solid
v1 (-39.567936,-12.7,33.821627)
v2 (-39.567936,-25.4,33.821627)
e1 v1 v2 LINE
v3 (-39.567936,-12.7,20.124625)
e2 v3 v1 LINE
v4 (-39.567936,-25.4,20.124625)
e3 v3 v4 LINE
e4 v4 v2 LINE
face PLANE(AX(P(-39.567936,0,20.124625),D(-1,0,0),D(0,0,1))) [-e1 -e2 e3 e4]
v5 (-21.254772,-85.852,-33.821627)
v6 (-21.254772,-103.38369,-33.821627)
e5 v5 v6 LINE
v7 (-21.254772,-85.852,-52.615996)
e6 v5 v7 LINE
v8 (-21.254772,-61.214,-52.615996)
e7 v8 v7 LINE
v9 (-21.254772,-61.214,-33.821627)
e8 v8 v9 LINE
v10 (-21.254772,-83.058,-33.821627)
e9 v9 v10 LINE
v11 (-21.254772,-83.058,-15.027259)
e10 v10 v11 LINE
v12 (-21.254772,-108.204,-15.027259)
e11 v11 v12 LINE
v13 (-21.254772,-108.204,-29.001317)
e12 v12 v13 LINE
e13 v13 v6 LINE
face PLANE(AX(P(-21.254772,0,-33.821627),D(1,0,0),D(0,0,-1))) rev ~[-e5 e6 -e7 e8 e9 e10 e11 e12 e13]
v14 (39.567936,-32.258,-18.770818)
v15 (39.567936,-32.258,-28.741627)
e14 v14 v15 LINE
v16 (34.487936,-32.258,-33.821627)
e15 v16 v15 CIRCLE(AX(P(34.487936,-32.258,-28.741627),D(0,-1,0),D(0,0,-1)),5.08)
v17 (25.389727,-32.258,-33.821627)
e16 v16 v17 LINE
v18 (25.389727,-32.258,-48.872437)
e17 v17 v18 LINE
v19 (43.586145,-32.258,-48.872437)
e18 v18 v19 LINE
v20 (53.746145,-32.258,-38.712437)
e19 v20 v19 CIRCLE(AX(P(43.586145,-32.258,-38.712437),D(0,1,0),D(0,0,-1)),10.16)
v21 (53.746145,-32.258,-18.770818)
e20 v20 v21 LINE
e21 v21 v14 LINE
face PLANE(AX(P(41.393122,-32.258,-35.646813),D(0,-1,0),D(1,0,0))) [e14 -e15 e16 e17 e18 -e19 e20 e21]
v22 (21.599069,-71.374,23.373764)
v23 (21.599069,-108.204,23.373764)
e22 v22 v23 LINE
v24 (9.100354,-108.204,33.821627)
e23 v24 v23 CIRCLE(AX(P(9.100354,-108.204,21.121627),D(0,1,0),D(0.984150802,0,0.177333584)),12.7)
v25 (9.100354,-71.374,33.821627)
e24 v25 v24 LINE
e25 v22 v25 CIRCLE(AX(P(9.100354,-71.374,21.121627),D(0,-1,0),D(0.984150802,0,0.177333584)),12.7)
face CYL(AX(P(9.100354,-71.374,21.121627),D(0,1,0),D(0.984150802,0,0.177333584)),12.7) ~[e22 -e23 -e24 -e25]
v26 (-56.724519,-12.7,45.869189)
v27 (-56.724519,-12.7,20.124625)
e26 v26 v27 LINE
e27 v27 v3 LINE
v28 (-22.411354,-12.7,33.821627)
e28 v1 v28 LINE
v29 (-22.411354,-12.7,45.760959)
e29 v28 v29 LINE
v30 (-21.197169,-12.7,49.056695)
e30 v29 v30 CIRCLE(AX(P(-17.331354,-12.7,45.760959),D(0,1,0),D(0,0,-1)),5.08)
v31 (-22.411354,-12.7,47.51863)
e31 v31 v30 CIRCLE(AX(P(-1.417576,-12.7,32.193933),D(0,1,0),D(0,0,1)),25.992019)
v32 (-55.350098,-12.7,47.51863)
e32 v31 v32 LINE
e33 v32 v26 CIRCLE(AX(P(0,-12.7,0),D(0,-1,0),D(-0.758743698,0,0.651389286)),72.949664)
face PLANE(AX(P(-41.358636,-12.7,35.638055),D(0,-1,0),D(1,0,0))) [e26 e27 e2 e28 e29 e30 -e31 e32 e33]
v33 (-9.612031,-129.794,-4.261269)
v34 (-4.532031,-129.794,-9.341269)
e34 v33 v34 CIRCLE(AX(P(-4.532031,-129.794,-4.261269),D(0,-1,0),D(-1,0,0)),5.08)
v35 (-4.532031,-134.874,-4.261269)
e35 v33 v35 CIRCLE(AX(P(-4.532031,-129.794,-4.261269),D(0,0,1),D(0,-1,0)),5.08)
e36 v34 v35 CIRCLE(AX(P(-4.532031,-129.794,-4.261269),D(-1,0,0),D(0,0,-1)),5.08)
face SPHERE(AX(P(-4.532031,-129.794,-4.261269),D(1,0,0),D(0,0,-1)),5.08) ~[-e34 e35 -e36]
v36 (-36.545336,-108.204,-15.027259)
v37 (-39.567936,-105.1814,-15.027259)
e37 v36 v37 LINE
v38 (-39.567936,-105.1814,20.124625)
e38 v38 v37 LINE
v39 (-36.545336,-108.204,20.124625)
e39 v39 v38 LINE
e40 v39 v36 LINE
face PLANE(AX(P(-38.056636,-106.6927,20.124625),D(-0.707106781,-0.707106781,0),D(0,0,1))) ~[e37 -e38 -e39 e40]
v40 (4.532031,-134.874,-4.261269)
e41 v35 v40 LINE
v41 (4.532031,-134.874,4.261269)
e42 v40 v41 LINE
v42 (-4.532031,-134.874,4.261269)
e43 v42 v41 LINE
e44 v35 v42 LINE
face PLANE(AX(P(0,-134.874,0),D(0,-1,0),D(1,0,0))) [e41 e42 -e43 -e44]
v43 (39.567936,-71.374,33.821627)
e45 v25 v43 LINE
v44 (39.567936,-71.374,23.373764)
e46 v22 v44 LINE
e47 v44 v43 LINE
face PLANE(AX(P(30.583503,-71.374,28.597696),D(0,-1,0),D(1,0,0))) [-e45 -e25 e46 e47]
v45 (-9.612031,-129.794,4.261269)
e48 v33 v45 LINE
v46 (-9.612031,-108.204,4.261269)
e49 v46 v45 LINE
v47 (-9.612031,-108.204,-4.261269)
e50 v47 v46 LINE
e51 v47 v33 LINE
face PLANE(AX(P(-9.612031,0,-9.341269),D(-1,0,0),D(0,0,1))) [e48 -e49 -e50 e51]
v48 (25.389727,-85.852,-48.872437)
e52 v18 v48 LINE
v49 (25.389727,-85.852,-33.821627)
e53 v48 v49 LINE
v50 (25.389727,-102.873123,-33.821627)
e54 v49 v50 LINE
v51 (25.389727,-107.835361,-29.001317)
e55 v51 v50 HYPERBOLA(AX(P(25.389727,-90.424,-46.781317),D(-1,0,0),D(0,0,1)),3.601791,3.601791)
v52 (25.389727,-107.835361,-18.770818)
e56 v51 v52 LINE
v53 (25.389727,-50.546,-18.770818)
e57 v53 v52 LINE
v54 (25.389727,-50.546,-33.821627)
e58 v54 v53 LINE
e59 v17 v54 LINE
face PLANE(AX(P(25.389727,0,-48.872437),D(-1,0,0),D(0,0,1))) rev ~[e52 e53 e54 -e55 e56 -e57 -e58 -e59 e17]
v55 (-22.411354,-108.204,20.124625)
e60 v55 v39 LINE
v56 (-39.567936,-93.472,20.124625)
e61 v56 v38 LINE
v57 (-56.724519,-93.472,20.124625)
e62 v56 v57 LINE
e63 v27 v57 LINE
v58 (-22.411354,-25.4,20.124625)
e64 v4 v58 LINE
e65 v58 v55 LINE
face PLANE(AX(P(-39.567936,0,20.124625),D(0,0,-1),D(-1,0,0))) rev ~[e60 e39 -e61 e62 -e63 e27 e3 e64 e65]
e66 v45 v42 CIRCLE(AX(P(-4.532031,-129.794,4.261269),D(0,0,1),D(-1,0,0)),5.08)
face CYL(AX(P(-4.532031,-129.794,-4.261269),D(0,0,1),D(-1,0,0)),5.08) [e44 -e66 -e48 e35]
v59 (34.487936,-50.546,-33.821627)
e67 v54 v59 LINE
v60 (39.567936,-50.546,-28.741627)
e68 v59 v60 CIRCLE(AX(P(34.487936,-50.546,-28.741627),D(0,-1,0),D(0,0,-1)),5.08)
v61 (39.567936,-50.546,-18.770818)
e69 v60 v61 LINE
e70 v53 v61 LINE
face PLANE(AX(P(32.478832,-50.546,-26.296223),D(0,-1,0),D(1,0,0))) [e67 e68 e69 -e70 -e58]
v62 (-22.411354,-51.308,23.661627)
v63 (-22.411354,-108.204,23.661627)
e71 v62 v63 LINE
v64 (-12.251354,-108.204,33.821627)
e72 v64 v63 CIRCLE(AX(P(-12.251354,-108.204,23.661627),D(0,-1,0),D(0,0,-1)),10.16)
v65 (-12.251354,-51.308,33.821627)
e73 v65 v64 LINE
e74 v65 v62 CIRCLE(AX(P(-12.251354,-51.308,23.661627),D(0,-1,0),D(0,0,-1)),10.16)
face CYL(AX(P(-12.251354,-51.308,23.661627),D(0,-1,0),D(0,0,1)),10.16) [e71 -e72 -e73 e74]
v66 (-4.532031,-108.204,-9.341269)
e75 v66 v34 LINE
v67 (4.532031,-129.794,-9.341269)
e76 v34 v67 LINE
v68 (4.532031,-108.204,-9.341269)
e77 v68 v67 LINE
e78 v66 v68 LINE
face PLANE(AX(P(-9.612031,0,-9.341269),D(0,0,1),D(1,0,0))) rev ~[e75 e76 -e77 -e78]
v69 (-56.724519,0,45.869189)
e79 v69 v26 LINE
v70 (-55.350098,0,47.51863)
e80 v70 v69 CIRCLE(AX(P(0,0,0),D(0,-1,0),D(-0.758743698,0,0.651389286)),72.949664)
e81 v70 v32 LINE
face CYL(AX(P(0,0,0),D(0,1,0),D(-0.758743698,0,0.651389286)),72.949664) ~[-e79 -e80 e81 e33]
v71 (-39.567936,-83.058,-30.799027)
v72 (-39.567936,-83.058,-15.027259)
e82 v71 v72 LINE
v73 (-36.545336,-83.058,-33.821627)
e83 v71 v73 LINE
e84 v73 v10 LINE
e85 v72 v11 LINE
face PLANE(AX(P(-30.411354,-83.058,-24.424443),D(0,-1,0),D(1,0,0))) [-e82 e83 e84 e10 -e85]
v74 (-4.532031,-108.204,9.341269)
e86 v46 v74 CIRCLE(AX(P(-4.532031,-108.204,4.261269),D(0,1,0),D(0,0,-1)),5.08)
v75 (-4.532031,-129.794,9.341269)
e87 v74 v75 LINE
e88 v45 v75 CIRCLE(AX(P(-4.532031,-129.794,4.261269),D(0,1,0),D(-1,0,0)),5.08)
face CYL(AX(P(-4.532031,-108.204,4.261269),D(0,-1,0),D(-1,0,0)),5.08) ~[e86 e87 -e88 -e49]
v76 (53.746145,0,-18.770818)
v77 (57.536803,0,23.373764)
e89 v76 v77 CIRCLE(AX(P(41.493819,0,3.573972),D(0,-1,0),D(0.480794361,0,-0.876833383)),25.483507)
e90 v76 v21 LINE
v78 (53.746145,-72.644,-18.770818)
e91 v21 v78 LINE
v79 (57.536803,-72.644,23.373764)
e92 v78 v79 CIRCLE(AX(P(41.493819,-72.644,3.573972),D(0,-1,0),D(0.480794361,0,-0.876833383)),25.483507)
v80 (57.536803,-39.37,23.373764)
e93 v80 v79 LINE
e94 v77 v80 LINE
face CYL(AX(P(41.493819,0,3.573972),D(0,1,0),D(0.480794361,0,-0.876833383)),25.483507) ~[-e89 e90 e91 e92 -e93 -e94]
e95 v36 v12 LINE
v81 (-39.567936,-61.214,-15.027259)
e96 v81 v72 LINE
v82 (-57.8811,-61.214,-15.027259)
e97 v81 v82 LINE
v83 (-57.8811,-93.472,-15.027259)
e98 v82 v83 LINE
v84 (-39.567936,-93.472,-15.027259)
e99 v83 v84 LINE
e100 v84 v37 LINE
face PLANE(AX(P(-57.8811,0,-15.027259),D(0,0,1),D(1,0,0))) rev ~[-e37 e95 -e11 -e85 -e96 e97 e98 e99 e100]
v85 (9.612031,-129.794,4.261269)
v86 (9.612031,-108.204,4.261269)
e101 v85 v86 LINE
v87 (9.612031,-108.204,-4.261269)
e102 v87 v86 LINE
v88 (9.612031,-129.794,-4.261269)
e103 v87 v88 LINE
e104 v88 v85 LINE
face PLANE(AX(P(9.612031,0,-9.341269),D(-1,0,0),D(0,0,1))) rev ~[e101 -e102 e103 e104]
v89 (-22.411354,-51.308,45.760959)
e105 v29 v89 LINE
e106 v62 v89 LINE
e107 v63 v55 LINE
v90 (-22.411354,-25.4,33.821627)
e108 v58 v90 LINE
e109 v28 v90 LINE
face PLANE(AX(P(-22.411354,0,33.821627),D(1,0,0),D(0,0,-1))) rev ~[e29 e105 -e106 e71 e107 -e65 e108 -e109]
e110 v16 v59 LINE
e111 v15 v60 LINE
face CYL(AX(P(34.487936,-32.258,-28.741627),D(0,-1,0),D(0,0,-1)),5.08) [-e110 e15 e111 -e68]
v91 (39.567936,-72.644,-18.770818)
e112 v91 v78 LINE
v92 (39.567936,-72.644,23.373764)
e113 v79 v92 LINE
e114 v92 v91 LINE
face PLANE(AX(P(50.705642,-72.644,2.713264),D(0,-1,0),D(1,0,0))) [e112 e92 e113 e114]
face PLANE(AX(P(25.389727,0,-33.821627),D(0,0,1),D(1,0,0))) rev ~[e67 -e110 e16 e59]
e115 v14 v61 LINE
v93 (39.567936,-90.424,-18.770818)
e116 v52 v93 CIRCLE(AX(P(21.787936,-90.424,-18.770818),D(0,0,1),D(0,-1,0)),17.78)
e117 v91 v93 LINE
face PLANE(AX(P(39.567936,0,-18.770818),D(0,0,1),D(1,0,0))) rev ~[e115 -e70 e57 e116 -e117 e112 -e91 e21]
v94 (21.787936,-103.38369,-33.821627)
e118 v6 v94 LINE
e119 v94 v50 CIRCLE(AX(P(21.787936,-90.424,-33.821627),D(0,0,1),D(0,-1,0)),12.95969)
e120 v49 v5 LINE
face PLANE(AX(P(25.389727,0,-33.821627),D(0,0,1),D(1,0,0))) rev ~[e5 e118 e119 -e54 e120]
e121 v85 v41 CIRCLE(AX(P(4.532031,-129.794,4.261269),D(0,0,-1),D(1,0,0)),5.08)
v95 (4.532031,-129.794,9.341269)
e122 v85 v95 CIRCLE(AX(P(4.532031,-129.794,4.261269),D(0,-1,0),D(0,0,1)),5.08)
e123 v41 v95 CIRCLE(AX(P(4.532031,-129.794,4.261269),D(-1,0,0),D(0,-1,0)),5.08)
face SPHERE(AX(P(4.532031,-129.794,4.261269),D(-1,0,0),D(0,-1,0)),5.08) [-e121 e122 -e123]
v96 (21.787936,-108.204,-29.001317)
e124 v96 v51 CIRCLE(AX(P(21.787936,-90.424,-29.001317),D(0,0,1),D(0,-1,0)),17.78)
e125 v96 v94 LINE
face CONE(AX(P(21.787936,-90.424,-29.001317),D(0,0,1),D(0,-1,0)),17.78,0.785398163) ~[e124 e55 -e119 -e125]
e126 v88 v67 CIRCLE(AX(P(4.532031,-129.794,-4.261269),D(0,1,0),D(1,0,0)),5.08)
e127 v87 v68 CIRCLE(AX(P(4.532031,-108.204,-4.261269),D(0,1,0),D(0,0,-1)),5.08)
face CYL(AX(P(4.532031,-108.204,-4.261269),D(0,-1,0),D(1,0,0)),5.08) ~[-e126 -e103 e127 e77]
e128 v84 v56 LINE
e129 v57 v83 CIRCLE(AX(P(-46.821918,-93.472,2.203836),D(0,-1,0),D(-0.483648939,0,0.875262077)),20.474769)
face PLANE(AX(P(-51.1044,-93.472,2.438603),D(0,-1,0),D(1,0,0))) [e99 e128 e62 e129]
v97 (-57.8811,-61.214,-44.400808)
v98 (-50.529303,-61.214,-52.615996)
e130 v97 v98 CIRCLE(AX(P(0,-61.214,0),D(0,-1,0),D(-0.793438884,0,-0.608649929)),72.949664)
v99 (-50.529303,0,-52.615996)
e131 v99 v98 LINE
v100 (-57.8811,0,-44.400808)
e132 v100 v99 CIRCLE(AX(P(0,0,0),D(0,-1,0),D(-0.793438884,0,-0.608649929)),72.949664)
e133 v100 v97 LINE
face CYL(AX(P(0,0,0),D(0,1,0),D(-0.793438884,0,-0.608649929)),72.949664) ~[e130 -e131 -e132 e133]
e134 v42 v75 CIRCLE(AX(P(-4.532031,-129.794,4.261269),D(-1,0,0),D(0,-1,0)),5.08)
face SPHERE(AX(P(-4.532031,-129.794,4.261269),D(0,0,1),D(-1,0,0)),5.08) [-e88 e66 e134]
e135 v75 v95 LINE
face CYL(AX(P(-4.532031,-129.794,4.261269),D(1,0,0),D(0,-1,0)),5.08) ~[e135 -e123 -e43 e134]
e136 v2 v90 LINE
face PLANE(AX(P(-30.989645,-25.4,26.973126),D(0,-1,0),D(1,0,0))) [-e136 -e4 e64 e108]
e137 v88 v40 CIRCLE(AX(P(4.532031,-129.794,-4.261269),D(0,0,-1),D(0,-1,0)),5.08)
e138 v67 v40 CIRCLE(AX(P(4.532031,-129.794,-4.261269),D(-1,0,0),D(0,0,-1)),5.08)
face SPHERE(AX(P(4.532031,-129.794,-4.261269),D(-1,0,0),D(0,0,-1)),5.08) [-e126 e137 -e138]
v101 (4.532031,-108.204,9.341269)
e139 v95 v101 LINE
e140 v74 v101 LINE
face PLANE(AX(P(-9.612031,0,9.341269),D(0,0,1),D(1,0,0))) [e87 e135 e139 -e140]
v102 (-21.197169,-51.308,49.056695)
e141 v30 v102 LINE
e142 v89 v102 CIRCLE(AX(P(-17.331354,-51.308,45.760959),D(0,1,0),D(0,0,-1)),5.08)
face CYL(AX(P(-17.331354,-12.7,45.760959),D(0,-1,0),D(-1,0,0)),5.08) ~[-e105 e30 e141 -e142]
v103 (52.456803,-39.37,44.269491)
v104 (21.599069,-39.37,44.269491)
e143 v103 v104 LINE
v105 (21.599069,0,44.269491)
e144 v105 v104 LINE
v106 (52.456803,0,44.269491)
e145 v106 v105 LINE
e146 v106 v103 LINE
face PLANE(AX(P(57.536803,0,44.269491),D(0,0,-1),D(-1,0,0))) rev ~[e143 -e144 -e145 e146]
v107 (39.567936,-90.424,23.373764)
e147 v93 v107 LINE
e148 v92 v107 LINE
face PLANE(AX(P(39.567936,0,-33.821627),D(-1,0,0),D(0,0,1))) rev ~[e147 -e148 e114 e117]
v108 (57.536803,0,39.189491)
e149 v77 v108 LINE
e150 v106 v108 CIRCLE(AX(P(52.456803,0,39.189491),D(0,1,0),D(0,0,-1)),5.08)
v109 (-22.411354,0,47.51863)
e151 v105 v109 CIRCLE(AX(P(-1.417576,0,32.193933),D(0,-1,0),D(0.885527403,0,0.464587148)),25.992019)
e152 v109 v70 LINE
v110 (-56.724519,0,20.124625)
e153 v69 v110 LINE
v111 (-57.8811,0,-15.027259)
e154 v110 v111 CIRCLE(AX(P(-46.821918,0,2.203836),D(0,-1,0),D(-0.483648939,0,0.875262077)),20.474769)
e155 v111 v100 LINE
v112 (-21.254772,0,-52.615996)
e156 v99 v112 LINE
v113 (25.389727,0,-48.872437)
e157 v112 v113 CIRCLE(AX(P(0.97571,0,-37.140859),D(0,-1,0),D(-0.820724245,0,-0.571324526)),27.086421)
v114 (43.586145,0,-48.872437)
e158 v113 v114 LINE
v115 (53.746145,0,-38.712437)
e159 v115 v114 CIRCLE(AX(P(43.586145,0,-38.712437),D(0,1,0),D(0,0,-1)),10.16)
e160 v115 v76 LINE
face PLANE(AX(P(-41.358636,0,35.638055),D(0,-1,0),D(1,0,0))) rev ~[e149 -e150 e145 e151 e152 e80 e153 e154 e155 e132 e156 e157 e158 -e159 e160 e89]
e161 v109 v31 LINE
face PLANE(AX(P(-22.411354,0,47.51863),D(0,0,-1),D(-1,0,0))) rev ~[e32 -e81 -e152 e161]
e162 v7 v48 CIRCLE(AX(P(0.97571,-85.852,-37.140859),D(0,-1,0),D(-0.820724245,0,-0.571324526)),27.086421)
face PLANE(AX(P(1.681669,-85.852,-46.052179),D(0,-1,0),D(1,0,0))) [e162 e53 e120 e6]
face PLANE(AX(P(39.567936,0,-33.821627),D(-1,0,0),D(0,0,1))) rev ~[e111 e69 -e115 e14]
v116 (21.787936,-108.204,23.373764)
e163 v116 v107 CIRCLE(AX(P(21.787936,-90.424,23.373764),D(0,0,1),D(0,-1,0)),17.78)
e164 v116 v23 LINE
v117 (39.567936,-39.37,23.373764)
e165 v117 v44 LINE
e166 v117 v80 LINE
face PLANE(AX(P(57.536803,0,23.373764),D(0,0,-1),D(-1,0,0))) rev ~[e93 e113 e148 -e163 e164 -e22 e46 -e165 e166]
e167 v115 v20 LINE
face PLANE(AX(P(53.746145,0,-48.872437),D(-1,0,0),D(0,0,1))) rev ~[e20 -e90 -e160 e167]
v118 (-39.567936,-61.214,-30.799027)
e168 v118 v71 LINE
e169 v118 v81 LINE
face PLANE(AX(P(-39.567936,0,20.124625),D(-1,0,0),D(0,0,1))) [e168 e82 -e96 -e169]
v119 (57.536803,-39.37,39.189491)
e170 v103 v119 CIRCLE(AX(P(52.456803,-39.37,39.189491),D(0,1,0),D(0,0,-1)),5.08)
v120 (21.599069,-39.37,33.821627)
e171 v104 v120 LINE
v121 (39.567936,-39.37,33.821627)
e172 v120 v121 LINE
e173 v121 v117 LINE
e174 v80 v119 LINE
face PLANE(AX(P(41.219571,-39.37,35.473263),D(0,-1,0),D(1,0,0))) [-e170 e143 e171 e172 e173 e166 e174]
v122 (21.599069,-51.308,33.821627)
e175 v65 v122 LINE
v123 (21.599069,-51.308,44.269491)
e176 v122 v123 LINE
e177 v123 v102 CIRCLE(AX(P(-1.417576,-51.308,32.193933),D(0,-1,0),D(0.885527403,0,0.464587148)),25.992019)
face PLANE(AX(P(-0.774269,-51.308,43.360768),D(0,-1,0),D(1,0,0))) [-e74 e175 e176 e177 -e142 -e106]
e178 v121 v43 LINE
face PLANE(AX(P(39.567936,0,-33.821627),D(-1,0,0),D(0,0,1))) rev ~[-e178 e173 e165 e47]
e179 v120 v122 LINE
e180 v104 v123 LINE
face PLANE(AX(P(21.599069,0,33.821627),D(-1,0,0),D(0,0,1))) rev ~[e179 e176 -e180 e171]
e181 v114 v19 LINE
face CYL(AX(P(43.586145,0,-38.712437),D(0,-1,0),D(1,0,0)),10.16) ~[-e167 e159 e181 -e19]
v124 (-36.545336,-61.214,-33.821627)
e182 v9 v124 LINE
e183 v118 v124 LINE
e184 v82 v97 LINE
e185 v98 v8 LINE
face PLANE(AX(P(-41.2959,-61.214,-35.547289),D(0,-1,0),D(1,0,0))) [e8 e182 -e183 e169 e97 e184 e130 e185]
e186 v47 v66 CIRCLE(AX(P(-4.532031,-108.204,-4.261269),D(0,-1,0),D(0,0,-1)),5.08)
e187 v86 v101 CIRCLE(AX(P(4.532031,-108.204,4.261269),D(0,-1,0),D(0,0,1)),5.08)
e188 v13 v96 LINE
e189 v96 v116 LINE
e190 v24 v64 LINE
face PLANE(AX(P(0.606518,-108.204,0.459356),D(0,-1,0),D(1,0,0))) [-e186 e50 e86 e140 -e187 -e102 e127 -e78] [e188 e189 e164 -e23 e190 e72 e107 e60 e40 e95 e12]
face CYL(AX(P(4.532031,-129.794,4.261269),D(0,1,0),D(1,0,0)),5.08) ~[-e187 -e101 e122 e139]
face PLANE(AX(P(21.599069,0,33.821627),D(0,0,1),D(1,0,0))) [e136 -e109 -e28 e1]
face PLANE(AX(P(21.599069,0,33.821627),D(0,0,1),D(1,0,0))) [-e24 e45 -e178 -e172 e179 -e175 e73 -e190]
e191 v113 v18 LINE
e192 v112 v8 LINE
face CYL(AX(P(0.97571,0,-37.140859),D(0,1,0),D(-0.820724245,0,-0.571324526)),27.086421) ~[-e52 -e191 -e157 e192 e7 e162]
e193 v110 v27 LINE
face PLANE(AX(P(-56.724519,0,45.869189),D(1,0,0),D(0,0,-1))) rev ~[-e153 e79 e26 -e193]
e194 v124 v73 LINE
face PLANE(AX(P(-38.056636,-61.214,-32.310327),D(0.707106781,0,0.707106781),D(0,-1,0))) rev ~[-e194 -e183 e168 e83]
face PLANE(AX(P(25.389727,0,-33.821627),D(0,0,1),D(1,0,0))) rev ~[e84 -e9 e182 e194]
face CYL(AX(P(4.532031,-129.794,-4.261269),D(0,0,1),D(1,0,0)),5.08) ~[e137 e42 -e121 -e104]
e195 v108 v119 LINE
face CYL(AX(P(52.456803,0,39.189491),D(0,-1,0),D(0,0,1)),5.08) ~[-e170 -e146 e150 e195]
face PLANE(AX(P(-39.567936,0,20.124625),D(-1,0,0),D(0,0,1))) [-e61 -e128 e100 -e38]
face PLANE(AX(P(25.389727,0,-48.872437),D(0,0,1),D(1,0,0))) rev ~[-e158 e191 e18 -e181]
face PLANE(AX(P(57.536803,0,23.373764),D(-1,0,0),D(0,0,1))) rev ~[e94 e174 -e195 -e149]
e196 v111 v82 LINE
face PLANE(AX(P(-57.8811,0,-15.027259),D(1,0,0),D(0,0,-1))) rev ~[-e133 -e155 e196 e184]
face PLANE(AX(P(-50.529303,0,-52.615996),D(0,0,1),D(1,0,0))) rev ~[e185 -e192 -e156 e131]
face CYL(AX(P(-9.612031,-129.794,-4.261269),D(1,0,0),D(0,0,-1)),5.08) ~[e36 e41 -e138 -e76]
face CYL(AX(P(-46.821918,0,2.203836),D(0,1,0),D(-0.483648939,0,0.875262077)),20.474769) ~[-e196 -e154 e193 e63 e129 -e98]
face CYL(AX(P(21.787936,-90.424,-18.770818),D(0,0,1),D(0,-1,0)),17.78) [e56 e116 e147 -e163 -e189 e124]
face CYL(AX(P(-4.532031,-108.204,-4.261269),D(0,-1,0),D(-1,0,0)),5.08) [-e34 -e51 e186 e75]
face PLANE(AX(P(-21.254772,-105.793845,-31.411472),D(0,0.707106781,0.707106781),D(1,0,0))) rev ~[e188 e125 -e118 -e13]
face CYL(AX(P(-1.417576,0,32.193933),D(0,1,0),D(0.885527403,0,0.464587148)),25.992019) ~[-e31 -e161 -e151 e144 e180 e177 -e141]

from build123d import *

# Parameters (mm, degrees)
F0_W         = 19.224062562
F0_H         = 18.6825376004
F1_DEPTH     = 134.874
F2_DEPTH     = 108.204
F0_W_2       = 18.3131638914
F0_H_2       = 18.7943680212
F3_DEPTH     = 83.058
F0_W_3       = 17.1565823257
F0_H_3       = 13.6970020831
F4_DEPTH     = 25.4
F0_W_4       = 17.9688669741
F0_H_4       = 10.4478634894
F5_DEPTH     = 71.374
F0_W_5       = 14.1782090068
F0_H_5       = 15.0508098304
F6_DEPTH     = 50.546
F7_DEPTH     = 72.644
F8_DEPTH     = 85.852
F9_DEPTH     = 51.308
F10_DEPTH    = 93.472
F11_DEPTH    = 61.214
F12_DEPTH    = 32.258
F13_DEPTH    = 39.37
F14_DEPTH    = 12.7
F15_R        = 5.08
F16_R        = 10.16
F17_R        = 5.08
F18_T1_DEPTH = 68.0767879487
F19_R        = 10.16
F20_SIZE     = 3.0226
F21_R        = 17.78
F22_SIZE     = 4.8203104
F23_R        = 5.08
F24_R        = 5.08
F25_R        = 5.08
F26_R        = 5.08
F27_R        = 5.08


# Not quite as in the source:
# - a fillet or chamfer that OpenCascade refuses, or shapes differently, is made with other operations: its cross-section is extruded or revolved along the edge and cut away or added


with BuildPart() as f1:
    # F0 (on Front) → F1 (new body)
    with BuildSketch(Plane.XZ):
        Rectangle(F0_W, F0_H)
    extrude(amount=F1_DEPTH)

    # F0 (on Front) → F2 (join)
    with BuildSketch(Plane.XZ):
        Polygon((-21.2547723204, -33.8216274977), (25.389727205, -33.8216274977), (25.389727205, -18.7708176672), (39.5679362118, -18.7708176672), (39.5679362118, 23.3737640083), (21.5990692377, 23.3737640083), (21.5990692377, 33.8216274977), (-22.4113538861, 33.8216274977), (-22.4113538861, 20.1246254146), (-39.5679362118, 20.1246254146), (-39.5679362118, -15.0272594765), (-21.2547723204, -15.0272594765), align=None)
        Rectangle(F0_W, F0_H, mode=Mode.SUBTRACT)
    extrude(amount=F2_DEPTH)

    # F0 (on Front) → F3 (join)
    with BuildSketch(Plane.XZ):
        with Locations((-30.4113542661, -24.4244434871)):
            Rectangle(F0_W_2, F0_H_2)
    extrude(amount=F3_DEPTH)

    # F0 (on Front) → F4 (join)
    with BuildSketch(Plane.XZ):
        with Locations((-30.989645049, 26.9731264561)):
            Rectangle(F0_W_3, F0_H_3)
    extrude(amount=F4_DEPTH)

    # F0 (on Front) → F5 (join)
    with BuildSketch(Plane.XZ):
        with Locations((30.5835027248, 28.597695753)):
            Rectangle(F0_W_4, F0_H_4)
    extrude(amount=F5_DEPTH)

    # F0 (on Front) → F6 (join)
    with BuildSketch(Plane.XZ):
        with Locations((32.4788317084, -26.2962225825)):
            Rectangle(F0_W_5, F0_H_5)
    extrude(amount=F6_DEPTH)

    # F0 (on Front) → F7 (join)
    with BuildSketch(Plane.XZ):
        with BuildLine():
            Line((39.5679362118, 23.3737640083), (39.5679362118, -18.7708176672))
            Line((39.5679362118, -18.7708176672), (53.7461452186, -18.7708176672))
            ThreePointArc((53.7461452186, -18.7708176672), (66.8748667644, 1.2910953871), (57.5368031859, 23.3737640083))
            Line((57.5368031859, 23.3737640083), (39.5679362118, 23.3737640083))
        make_face()
    extrude(amount=F7_DEPTH)

    # F0 (on Front) → F8 (join)
    with BuildSketch(Plane.XZ):
        with BuildLine():
            Line((25.389727205, -48.8724373281), (25.389727205, -33.8216274977))
            Line((25.389727205, -33.8216274977), (-21.2547723204, -33.8216274977))
            Line((-21.2547723204, -33.8216274977), (-21.2547723204, -52.6159955189))
            ThreePointArc((-21.2547723204, -52.6159955189), (3.1426231279, -64.1404640217), (25.389727205, -48.8724373281))
        make_face()
    extrude(amount=F8_DEPTH)

    # F0 (on Front) → F9 (join)
    with BuildSketch(Plane.XZ):
        with BuildLine():
            Line((-22.4113538861, 33.8216274977), (21.5990692377, 33.8216274977))
            Line((21.5990692377, 33.8216274977), (21.5990692377, 44.2694909871))
            ThreePointArc((21.5990692377, 44.2694909871), (0.4961178031, 58.1154072117), (-22.4113538861, 47.5186295807))
            Line((-22.4113538861, 47.5186295807), (-22.4113538861, 33.8216274977))
        make_face()
    extrude(amount=F9_DEPTH)

    # F0 (on Front) → F10 (join)
    with BuildSketch(Plane.XZ):
        with BuildLine():
            Line((-57.8811001033, -15.0272594765), (-39.5679362118, -15.0272594765))
            Line((-39.5679362118, -15.0272594765), (-39.5679362118, 20.1246254146))
            Line((-39.5679362118, 20.1246254146), (-56.7245185375, 20.1246254146))
            ThreePointArc((-56.7245185375, 20.1246254146), (-67.2856136398, 2.8771412434), (-57.8811001033, -15.0272594765))
        make_face()
    extrude(amount=F10_DEPTH)

    # F0 (on Front) → F11 (join)
    with BuildSketch(Plane.XZ):
        with BuildLine():
            Line((-21.2547723204, -52.6159955189), (-21.2547723204, -33.8216274977))
            Line((-21.2547723204, -33.8216274977), (-39.5679362118, -33.8216274977))
            Line((-39.5679362118, -33.8216274977), (-39.5679362118, -15.0272594765))
            Line((-39.5679362118, -15.0272594765), (-57.8811001033, -15.0272594765))
            Line((-57.8811001033, -15.0272594765), (-57.8811001033, -44.4008079084))
            ThreePointArc((-57.8811001033, -44.4008079084), (-54.3606128257, -48.647479537), (-50.5293034549, -52.6159955189))
            Line((-50.5293034549, -52.6159955189), (-21.2547723204, -52.6159955189))
        make_face()
    extrude(amount=F11_DEPTH)

    # F0 (on Front) → F12 (join)
    with BuildSketch(Plane.XZ):
        Polygon((39.5679362118, -18.7708176672), (39.5679362118, -33.8216274977), (25.389727205, -33.8216274977), (25.389727205, -48.8724373281), (53.7461452186, -48.8724373281), (53.7461452186, -18.7708176672), align=None)
    extrude(amount=F12_DEPTH)

    # F0 (on Front) → F13 (join)
    with BuildSketch(Plane.XZ):
        Polygon((39.5679362118, 33.8216274977), (39.5679362118, 23.3737640083), (57.5368031859, 23.3737640083), (57.5368031859, 44.2694909871), (21.5990692377, 44.2694909871), (21.5990692377, 33.8216274977), align=None)
    extrude(amount=F13_DEPTH)

    # F0 (on Front) → F14 (join)
    with BuildSketch(Plane.XZ):
        with BuildLine():
            Line((-56.7245185375, 20.1246254146), (-39.5679362118, 20.1246254146))
            Line((-39.5679362118, 20.1246254146), (-39.5679362118, 33.8216274977))
            Line((-39.5679362118, 33.8216274977), (-22.4113538861, 33.8216274977))
            Line((-22.4113538861, 33.8216274977), (-22.4113538861, 47.5186295807))
            Line((-22.4113538861, 47.5186295807), (-55.3500978757, 47.5186295807))
            ThreePointArc((-55.3500978757, 47.5186295807), (-56.0433767246, 46.6989659134), (-56.7245185375, 45.8691888828))
            Line((-56.7245185375, 45.8691888828), (-56.7245185375, 20.1246254146))
        make_face()
    extrude(amount=F14_DEPTH)

    # F15
    f15_edges = [f1.edges().sort_by_distance(p)[0] for p in [
        (57.536803, -19.685, 44.269491),
    ]]
    fillet(f15_edges, radius=F15_R)

    # F16
    f16_edges = [f1.edges().sort_by_distance(p)[0] for p in [
        (53.746145, -16.129, -48.872437),
    ]]
    fillet(f16_edges, radius=F16_R)

    # F17
    f17_edges = [f1.edges().sort_by_distance(p)[0] for p in [
        (39.567936, -41.402, -33.821627),
    ]]
    fillet(f17_edges, radius=F17_R)

    # F18: fillet of radius 12.7 on 1 edges, made by hand

    # F18_s2 → F18_t1 (cut)
    with BuildSketch(Plane.XZ.offset(71.374)):
        with BuildLine():
            ThreePointArc((21.5990692377, 23.3737640083), (17.2455325804, 30.8656547371), (9.1003540582, 33.8216274977))
            Line((9.1003540582, 33.8216274977), (21.5990692377, 33.8216274977))
            Line((21.5990692377, 33.8216274977), (21.5990692377, 23.3737640083))
        make_face()
    extrude(amount=F18_T1_DEPTH, mode=Mode.SUBTRACT)

    # F19
    f19_edges = [f1.edges().sort_by_distance(p)[0] for p in [
        (-22.411354, -79.756, 33.821627),
    ]]
    fillet(f19_edges, radius=F19_R)

    # F20
    f20_edges = [f1.edges().sort_by_distance(p)[0] for p in [
        (-39.567936, -72.136, -33.821627),
        (-39.567936, -108.204, 2.548683),
    ]]
    chamfer(f20_edges, length=F20_SIZE)

    # F21
    f21_edges = [f1.edges().sort_by_distance(p)[0] for p in [
        (39.567936, -108.204, 2.301473),
    ]]
    fillet(f21_edges, radius=F21_R)

    # F22
    f22_edges = [f1.edges().sort_by_distance(p)[0] for p in [
        (0.266582, -108.204, -33.821627),
        (23.59824, -108.1116, -33.821627),
    ]]
    chamfer(f22_edges, length=F22_SIZE)

    # F23
    f23_edges = [f1.edges().sort_by_distance(p)[0] for p in [
        (0, -134.874, -9.341269),
    ]]
    fillet(f23_edges, radius=F23_R)

    # F24
    f24_edges = [f1.edges().sort_by_distance(p)[0] for p in [
        (-9.612031, -134.874, 2.54),
    ]]
    fillet(f24_edges, radius=F24_R)

    # F25
    f25_edges = [f1.edges().sort_by_distance(p)[0] for p in [
        (2.54, -134.874, 9.341269),
    ]]
    fillet(f25_edges, radius=F25_R)

    # F26
    f26_edges = [f1.edges().sort_by_distance(p)[0] for p in [
        (9.612031, -134.874, 0),
    ]]
    fillet(f26_edges, radius=F26_R)

    # F27
    f27_edges = [f1.edges().sort_by_distance(p)[0] for p in [
        (-22.411354, -32.004, 47.51863),
    ]]
    fillet(f27_edges, radius=F27_R)


solid = f1.part
